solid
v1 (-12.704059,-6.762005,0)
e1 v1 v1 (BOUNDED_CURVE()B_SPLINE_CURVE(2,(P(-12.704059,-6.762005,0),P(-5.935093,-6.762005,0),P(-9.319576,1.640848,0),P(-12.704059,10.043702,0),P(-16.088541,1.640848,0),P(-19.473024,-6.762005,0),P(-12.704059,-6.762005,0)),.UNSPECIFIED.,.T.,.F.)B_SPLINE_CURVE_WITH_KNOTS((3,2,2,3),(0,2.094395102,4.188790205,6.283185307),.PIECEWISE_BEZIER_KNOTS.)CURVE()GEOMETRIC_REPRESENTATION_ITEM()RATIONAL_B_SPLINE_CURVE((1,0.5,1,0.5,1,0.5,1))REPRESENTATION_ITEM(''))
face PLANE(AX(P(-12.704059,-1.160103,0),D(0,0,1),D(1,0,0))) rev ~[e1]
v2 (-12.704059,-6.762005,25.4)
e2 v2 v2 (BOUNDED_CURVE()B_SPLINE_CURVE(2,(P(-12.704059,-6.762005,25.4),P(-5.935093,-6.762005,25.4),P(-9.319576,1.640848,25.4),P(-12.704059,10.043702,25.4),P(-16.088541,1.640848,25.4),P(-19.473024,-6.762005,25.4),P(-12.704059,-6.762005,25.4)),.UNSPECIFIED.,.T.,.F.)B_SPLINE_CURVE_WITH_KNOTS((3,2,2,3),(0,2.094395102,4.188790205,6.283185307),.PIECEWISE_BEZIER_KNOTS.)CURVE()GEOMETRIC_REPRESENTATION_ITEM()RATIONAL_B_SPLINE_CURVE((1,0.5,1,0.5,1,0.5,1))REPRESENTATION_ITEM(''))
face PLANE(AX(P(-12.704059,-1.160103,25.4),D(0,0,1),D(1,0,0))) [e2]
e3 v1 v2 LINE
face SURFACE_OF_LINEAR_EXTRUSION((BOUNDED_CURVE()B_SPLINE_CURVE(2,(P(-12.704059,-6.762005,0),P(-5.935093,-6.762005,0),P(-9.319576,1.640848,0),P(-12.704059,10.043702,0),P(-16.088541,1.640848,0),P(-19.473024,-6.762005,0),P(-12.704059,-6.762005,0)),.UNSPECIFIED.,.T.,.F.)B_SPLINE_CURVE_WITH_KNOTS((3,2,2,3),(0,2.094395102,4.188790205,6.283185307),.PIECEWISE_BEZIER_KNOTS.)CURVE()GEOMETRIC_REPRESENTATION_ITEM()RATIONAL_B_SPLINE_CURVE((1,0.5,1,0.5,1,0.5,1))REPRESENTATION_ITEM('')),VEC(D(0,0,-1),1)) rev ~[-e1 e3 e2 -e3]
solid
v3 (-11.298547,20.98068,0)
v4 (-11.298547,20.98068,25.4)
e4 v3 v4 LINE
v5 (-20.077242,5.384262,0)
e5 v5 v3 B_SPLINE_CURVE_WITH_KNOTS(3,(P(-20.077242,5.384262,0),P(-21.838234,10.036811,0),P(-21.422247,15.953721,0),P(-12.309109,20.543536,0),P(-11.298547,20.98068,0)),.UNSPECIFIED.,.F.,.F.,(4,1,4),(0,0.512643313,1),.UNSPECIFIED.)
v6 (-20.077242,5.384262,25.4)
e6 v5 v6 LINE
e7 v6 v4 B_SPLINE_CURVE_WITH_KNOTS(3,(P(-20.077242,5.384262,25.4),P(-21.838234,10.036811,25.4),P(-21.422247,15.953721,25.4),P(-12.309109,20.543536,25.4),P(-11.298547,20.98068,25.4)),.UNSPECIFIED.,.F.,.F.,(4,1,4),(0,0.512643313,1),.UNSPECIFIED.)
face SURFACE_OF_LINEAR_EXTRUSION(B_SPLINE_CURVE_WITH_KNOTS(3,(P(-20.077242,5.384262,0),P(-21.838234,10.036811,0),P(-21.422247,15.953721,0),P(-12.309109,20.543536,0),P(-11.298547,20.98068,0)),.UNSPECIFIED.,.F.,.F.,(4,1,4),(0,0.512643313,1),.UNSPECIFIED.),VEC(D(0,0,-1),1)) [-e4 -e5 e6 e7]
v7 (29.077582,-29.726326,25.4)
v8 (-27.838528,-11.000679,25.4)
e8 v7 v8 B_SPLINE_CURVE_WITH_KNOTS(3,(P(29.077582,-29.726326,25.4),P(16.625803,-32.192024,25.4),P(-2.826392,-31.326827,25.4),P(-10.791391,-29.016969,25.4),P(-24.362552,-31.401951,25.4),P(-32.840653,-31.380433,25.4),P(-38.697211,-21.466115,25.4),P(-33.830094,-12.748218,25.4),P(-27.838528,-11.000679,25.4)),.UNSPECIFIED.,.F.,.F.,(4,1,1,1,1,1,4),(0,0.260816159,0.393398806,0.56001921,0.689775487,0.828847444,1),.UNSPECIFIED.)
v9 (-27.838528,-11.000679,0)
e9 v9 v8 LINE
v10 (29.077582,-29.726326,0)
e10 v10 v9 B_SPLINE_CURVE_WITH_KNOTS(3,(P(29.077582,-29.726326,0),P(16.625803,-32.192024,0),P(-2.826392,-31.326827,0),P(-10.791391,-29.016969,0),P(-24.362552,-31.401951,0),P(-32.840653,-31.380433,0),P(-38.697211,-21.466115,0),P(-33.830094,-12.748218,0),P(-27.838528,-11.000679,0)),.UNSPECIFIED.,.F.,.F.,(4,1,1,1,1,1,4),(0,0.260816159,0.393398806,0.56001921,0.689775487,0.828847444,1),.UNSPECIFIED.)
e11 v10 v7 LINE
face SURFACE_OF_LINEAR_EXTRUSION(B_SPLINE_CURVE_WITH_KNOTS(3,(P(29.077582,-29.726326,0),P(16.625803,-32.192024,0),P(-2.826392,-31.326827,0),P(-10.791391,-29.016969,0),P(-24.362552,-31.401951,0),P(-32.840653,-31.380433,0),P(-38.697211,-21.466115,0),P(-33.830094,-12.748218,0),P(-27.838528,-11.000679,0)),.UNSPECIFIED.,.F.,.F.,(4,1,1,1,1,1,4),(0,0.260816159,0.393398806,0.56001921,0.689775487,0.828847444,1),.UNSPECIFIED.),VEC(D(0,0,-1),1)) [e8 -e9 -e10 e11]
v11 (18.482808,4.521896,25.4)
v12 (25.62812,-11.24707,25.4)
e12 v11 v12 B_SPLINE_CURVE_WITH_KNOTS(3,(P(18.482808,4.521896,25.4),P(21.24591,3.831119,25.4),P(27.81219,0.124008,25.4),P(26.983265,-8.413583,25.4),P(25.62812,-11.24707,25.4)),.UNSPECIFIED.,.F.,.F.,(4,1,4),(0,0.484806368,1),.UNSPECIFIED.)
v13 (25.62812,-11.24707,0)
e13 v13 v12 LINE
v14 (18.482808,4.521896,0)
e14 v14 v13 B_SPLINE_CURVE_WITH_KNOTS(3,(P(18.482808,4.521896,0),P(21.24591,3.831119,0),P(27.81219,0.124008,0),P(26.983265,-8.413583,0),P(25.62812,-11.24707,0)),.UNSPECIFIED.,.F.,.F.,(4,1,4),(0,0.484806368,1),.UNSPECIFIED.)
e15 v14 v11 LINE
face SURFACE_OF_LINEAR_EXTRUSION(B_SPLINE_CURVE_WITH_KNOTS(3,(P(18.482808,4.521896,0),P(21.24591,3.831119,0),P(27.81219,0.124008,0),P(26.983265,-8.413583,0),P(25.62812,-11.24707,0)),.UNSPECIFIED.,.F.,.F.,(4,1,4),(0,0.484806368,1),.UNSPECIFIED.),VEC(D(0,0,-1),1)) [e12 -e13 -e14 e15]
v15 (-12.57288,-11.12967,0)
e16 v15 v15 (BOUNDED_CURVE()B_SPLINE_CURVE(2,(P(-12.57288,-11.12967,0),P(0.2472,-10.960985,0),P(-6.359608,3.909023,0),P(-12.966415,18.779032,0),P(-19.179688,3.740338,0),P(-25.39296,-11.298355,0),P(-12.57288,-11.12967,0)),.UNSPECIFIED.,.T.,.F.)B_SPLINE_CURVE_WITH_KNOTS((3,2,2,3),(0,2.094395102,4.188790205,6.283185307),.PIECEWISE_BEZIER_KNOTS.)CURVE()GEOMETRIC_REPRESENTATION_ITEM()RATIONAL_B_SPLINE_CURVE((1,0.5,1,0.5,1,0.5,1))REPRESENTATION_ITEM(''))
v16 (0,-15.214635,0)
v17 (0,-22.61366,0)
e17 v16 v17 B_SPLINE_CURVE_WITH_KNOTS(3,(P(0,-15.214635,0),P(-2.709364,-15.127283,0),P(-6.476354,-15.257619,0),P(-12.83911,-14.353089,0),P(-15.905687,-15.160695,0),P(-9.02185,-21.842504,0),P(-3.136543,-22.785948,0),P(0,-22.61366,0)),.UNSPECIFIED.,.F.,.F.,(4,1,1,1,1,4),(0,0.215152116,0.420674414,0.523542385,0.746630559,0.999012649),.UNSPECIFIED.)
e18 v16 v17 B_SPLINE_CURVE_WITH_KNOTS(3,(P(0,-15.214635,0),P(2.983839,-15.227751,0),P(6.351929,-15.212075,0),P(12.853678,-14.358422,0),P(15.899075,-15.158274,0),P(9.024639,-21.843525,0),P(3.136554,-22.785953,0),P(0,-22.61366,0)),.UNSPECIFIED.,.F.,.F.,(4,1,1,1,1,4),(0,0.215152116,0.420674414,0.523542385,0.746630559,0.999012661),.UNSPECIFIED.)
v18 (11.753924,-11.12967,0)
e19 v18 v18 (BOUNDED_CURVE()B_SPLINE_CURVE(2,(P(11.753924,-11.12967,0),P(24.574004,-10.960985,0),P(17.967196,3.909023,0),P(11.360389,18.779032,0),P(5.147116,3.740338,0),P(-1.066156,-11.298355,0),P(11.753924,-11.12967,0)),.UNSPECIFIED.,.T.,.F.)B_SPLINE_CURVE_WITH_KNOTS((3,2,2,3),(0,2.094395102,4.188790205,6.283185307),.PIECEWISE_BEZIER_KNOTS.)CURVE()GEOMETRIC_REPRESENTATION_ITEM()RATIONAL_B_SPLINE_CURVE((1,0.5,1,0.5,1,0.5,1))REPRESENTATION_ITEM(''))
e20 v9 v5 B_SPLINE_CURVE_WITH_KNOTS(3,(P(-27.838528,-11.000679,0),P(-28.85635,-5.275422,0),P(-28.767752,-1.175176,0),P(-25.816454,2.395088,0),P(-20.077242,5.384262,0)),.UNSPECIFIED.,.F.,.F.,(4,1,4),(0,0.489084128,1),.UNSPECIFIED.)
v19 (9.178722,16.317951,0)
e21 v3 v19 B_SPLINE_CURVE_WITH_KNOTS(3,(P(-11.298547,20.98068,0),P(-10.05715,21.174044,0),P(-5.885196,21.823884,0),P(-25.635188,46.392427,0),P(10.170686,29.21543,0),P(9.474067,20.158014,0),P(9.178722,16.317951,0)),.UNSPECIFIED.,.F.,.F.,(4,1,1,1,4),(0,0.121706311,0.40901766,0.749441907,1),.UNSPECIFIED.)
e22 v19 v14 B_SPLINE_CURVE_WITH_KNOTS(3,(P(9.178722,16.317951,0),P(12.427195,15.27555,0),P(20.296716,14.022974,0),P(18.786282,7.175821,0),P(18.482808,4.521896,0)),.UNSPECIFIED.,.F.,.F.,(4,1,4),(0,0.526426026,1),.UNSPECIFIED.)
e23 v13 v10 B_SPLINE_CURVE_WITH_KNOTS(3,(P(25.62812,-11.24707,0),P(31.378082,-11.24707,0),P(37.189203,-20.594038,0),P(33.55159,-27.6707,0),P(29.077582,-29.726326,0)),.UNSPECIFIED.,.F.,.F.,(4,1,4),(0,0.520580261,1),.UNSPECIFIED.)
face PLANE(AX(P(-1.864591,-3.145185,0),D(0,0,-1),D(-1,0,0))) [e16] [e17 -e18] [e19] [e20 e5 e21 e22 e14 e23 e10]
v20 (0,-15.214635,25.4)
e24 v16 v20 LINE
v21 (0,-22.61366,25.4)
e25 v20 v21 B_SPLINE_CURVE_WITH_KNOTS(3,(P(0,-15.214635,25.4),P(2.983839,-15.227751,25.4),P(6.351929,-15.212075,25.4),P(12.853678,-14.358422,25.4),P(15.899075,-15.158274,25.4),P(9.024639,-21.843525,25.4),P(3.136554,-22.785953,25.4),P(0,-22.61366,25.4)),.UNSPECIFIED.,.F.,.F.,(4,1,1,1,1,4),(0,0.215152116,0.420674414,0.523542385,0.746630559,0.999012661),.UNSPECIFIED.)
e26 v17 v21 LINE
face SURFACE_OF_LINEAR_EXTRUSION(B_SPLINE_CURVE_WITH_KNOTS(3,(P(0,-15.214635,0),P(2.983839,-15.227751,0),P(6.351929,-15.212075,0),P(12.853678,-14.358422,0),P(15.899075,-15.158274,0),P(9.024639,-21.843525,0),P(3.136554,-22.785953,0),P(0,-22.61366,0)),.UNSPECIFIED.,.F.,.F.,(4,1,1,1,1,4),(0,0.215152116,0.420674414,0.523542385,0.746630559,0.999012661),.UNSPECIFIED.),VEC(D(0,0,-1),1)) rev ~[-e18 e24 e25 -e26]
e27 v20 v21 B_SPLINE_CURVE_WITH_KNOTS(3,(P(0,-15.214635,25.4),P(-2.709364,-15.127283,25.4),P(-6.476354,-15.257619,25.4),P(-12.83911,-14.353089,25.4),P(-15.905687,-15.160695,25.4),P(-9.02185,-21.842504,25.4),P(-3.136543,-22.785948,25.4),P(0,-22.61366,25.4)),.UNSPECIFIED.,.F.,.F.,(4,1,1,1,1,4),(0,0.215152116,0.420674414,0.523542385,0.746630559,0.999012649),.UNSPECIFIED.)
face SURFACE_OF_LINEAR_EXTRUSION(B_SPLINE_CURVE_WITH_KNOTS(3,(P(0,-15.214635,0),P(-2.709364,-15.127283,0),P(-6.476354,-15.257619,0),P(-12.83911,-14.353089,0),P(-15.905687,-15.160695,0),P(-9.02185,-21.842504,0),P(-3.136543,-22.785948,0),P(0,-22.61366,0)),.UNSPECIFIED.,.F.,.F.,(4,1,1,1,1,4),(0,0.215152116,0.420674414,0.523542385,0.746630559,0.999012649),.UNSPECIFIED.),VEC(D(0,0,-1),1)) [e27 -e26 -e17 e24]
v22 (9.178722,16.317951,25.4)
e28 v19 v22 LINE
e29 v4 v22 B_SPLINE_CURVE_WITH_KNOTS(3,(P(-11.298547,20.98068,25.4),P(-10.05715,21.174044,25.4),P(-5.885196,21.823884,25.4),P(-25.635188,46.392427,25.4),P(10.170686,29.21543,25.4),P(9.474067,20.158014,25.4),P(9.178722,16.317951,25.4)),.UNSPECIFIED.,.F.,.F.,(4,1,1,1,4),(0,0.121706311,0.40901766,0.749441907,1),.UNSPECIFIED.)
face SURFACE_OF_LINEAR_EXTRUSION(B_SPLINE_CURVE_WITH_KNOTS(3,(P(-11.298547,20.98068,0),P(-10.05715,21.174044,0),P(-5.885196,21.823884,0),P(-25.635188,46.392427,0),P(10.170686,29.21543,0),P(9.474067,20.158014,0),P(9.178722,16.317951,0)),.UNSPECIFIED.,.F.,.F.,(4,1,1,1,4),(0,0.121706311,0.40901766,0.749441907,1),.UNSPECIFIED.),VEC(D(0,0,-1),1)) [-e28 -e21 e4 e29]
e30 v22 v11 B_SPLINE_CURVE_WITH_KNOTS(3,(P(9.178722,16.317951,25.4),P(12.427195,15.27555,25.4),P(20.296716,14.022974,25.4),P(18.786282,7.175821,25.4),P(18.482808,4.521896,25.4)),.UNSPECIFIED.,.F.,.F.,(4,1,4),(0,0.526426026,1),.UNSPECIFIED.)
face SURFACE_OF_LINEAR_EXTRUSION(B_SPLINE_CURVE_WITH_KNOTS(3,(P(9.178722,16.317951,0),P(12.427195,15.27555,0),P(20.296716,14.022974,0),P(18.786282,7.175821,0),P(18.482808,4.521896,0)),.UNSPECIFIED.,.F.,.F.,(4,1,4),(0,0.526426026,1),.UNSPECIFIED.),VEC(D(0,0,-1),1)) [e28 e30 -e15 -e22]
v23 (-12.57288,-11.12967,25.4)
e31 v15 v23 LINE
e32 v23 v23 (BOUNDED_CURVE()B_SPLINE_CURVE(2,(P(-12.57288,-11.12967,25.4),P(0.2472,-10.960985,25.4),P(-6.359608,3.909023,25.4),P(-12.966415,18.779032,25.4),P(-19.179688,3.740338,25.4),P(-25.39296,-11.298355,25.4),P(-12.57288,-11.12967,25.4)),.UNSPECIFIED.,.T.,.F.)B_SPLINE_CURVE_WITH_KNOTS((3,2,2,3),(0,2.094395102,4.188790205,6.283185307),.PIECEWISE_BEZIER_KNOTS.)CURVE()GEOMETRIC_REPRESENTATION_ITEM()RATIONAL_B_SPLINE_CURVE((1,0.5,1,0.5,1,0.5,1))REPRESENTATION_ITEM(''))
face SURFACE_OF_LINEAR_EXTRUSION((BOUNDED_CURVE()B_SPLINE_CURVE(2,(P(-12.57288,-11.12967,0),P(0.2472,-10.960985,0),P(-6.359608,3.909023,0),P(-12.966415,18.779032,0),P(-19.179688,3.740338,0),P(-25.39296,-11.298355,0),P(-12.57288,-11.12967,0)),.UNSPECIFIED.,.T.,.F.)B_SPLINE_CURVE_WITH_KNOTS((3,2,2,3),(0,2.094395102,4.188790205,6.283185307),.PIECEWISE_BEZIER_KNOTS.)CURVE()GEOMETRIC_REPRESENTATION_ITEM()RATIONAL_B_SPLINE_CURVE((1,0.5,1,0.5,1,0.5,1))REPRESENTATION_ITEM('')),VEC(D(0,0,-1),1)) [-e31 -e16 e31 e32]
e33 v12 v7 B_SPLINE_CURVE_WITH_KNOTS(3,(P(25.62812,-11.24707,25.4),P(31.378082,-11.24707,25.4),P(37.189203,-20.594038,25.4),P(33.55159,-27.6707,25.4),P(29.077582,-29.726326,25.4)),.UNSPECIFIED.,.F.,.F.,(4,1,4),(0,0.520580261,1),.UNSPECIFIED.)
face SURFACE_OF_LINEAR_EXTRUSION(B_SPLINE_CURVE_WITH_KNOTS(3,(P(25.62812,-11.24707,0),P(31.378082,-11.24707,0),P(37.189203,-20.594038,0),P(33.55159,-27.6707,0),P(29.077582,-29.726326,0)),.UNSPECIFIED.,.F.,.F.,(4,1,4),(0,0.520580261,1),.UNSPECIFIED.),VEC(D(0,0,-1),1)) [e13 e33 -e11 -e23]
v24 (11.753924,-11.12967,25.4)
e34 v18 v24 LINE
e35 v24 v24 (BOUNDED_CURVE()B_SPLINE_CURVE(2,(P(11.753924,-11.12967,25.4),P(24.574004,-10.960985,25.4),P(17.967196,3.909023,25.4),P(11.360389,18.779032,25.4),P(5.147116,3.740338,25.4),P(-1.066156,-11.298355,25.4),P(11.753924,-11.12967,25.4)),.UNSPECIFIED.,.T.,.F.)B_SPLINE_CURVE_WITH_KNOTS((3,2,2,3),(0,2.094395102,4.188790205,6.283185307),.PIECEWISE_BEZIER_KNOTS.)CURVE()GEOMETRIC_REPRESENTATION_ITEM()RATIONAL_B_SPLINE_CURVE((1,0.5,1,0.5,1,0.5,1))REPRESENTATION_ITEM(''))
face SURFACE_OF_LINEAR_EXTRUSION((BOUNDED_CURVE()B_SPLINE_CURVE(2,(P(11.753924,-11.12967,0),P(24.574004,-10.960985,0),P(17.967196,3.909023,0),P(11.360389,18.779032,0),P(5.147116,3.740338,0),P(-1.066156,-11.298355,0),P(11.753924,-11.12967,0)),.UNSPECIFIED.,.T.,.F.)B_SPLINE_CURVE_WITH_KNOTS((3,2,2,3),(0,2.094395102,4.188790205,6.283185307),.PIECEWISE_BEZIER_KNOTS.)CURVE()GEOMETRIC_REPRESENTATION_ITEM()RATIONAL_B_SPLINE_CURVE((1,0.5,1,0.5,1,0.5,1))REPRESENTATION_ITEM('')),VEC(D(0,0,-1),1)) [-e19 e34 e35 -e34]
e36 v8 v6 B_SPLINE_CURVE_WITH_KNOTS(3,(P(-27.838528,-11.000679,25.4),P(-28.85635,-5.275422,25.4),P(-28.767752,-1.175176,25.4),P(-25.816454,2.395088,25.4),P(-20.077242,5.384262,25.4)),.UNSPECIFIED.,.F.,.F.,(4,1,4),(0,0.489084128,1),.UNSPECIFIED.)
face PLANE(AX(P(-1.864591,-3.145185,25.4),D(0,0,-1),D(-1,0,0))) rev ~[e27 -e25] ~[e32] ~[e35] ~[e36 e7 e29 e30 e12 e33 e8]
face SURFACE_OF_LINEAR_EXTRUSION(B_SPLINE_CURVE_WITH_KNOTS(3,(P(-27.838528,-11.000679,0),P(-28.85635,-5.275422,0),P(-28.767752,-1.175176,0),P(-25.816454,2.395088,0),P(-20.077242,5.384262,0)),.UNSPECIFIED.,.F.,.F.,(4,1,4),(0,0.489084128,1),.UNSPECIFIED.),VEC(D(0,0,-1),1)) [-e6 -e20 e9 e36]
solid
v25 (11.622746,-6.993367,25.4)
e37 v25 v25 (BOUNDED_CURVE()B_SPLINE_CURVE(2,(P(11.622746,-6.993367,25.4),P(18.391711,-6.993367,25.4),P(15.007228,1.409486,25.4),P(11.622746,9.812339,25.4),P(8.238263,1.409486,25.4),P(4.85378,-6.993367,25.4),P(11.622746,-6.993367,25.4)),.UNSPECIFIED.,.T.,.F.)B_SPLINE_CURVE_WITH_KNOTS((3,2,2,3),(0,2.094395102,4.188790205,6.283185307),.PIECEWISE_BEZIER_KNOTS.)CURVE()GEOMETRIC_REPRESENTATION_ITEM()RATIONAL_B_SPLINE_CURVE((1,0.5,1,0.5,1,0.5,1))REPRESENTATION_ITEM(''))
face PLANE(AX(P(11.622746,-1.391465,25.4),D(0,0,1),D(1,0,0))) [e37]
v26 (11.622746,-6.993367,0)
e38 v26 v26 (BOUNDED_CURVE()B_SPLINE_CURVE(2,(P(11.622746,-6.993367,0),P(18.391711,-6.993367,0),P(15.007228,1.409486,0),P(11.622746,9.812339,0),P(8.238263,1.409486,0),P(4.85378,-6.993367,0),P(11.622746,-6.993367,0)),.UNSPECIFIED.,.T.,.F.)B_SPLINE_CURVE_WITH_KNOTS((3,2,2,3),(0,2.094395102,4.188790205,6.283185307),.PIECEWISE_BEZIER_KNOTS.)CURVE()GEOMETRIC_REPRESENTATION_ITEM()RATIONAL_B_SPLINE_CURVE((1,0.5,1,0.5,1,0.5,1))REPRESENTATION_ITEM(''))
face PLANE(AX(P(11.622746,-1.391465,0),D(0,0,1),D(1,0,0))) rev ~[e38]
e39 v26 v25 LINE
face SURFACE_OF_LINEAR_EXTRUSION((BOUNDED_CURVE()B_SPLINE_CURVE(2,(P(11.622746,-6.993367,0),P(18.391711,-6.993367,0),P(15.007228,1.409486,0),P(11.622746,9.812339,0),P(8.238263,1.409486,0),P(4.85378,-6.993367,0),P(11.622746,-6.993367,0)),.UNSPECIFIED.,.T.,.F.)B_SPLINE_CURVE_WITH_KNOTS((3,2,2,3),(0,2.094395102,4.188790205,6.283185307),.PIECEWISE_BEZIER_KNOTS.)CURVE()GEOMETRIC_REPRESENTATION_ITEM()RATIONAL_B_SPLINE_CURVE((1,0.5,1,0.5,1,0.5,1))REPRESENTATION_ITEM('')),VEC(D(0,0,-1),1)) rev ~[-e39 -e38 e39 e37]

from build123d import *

# Parameters (mm, degrees)
F1_DEPTH = 25.4


# Not quite as in the source:
# - a feature names something its author has since deleted; it is built from what else it names


with BuildPart() as f1:
    # F0 (on Top) → F1 (new body)
    with BuildSketch(Plane.XY):
        with BuildLine():
            add(Edge.make_bspline(
                [(-12.7040585503, -6.7620049231), (-5.9350933235, -6.7620049231), (-9.3195759369, 1.6408482916), (-12.7040585503, 10.0437015062), (-16.0885411637, 1.6408482916), (-19.4730237771, -6.7620049231), (-12.7040585503, -6.7620049231)],
                knots=[0, 0, 0, 2.0943951024, 2.0943951024, 4.1887902048, 4.1887902048, 6.2831853072, 6.2831853072, 6.2831853072], degree=2, weights=[1, 0.5, 1, 0.5, 1, 0.5, 1]))
        make_face()
    extrude(amount=F1_DEPTH)


with BuildPart() as f1b:
    # F0 (on Top) → F1, piece 2 (new body)
    with BuildSketch(Plane.XY):
        with BuildLine():
            add(Edge.make_bspline(
                [(11.6227455437, -6.9933673367), (18.3917107705, -6.9933673367), (15.0072281571, 1.409485878), (11.6227455437, 9.8123390926), (8.2382629303, 1.409485878), (4.8537803169, -6.9933673367), (11.6227455437, -6.9933673367)],
                knots=[0, 0, 0, 2.0943951024, 2.0943951024, 4.1887902048, 4.1887902048, 6.2831853072, 6.2831853072, 6.2831853072], degree=2, weights=[1, 0.5, 1, 0.5, 1, 0.5, 1]))
        make_face()
    extrude(amount=F1_DEPTH)


with BuildPart() as f1c:
    # F0 (on Top) → F1, piece 3 (new body)
    with BuildSketch(Plane.XY):
        with BuildLine():
            add(Edge.make_bspline(
                [(9.178722043, 16.3179510783), (12.4271948484, 15.2755498145), (20.2967156839, 14.022973572), (18.7862815098, 7.1758211052), (18.4828080237, 4.5218956657)],
                knots=[0, 0, 0, 0, 0.5264260263, 1, 1, 1, 1], degree=3))
            add(Edge.make_bspline(
                [(-11.2985467915, 20.9806796509), (-10.057150046, 21.1740444447), (-5.8851955456, 21.8238843325), (-25.6351875023, 46.3924273574), (10.1706858503, 29.215430324), (9.4740668065, 20.1580135174), (9.178722043, 16.3179510783)],
                knots=[0, 0, 0, 0, 0.1217063112, 0.4090176605, 0.7494419068, 1, 1, 1, 1], degree=3))
            add(Edge.make_bspline(
                [(-20.0772415847, 5.3842621855), (-21.8382337034, 10.0368110982), (-21.422247354, 15.9537207711), (-12.3091086617, 20.5435363037), (-11.2985467915, 20.9806796509)],
                knots=[0, 0, 0, 0, 0.5126433129, 1, 1, 1, 1], degree=3))
            add(Edge.make_bspline(
                [(-27.8385281563, -11.0006788746), (-28.8563501799, -5.2754222973), (-28.7677518132, -1.1751763415), (-25.8164535696, 2.3950880339), (-20.0772415847, 5.3842621855)],
                knots=[0, 0, 0, 0, 0.4890841283, 1, 1, 1, 1], degree=3))
            add(Edge.make_bspline(
                [(29.0775820613, -29.7263264656), (16.6258025491, -32.1920238286), (-2.8263918493, -31.3268267458), (-10.7913914989, -29.0169685325), (-24.3625523476, -31.4019512541), (-32.8406534725, -31.3804329417), (-38.6972113755, -21.4661147228), (-33.8300936303, -12.7482184899), (-27.8385281563, -11.0006788746)],
                knots=[0, 0, 0, 0, 0.2608161586, 0.3933988062, 0.5600192096, 0.6897754866, 0.8288474437, 1, 1, 1, 1], degree=3))
            add(Edge.make_bspline(
                [(25.6281197071, -11.2470695749), (31.3780816561, -11.2470695749), (37.1892028294, -20.5940376025), (33.5515896494, -27.670699974), (29.0775820613, -29.7263264656)],
                knots=[0, 0, 0, 0, 0.5205802608, 1, 1, 1, 1], degree=3))
            add(Edge.make_bspline(
                [(18.4828080237, 4.5218956657), (21.2459100287, 3.8311192941), (27.8121902179, 0.1240076306), (26.9832648337, -8.4135830402), (25.6281197071, -11.2470695749)],
                knots=[0, 0, 0, 0, 0.4848063676, 1, 1, 1, 1], degree=3))
        make_face()
        with BuildLine():
            add(Edge.make_bspline(
                [(-12.5728802401, -11.1296701583), (0.2471999237, -10.9609851603), (-6.3596076235, 3.9090234082), (-12.9664151708, 18.7790319766), (-19.1796877873, 3.7403384102), (-25.3929604038, -11.2983551563), (-12.5728802401, -11.1296701583)],
                knots=[0, 0, 0, 2.0943951024, 2.0943951024, 4.1887902048, 4.1887902048, 6.2831853072, 6.2831853072, 6.2831853072], degree=2, weights=[1, 0.5, 1, 0.5, 1, 0.5, 1]))
        make_face(mode=Mode.SUBTRACT)
        with BuildLine():
            add(Edge.make_bspline(
                [(0, -15.2146350592), (-2.7093640529, -15.1272825897), (-6.4763540853, -15.2576190966), (-12.8391100977, -14.3530894957), (-15.9056872213, -15.1606946119), (-9.0218502029, -21.8425042061), (-3.136542703, -22.7859484552), (-1.917e-07, -22.6136597791)],
                knots=[0, 0, 0, 0, 0.2151521156, 0.4206744136, 0.5235423855, 0.7466305589, 0.9990126491, 0.9990126491, 0.9990126491, 0.9990126491], degree=3))
            add(Edge.make_bspline(
                [(0, -15.2146350592), (2.9838385526, -15.2277508751), (6.3519287872, -15.2120746239), (12.8536782629, -14.3584220078), (15.8990746005, -15.1582741368), (9.0246394492, -21.8435253707), (3.1365539853, -22.7859527427), (-1.917e-07, -22.6136597791)],
                knots=[0, 0, 0, 0, 0.2151521156, 0.4206744136, 0.5235423855, 0.7466305589, 0.9990126612, 0.9990126612, 0.9990126612, 0.9990126612], degree=3))
        make_face(mode=Mode.SUBTRACT)
        with BuildLine():
            add(Edge.make_bspline(
                [(11.753923854, -11.1296701583), (24.5740040177, -10.9609851603), (17.9671964705, 3.9090234082), (11.3603889232, 18.7790319766), (5.1471163067, 3.7403384102), (-1.0661563098, -11.2983551563), (11.753923854, -11.1296701583)],
                knots=[0, 0, 0, 2.0943951024, 2.0943951024, 4.1887902048, 4.1887902048, 6.2831853072, 6.2831853072, 6.2831853072], degree=2, weights=[1, 0.5, 1, 0.5, 1, 0.5, 1]))
        make_face(mode=Mode.SUBTRACT)
    extrude(amount=F1_DEPTH)


solid = Compound([f1.part, f1b.part, f1c.part])
